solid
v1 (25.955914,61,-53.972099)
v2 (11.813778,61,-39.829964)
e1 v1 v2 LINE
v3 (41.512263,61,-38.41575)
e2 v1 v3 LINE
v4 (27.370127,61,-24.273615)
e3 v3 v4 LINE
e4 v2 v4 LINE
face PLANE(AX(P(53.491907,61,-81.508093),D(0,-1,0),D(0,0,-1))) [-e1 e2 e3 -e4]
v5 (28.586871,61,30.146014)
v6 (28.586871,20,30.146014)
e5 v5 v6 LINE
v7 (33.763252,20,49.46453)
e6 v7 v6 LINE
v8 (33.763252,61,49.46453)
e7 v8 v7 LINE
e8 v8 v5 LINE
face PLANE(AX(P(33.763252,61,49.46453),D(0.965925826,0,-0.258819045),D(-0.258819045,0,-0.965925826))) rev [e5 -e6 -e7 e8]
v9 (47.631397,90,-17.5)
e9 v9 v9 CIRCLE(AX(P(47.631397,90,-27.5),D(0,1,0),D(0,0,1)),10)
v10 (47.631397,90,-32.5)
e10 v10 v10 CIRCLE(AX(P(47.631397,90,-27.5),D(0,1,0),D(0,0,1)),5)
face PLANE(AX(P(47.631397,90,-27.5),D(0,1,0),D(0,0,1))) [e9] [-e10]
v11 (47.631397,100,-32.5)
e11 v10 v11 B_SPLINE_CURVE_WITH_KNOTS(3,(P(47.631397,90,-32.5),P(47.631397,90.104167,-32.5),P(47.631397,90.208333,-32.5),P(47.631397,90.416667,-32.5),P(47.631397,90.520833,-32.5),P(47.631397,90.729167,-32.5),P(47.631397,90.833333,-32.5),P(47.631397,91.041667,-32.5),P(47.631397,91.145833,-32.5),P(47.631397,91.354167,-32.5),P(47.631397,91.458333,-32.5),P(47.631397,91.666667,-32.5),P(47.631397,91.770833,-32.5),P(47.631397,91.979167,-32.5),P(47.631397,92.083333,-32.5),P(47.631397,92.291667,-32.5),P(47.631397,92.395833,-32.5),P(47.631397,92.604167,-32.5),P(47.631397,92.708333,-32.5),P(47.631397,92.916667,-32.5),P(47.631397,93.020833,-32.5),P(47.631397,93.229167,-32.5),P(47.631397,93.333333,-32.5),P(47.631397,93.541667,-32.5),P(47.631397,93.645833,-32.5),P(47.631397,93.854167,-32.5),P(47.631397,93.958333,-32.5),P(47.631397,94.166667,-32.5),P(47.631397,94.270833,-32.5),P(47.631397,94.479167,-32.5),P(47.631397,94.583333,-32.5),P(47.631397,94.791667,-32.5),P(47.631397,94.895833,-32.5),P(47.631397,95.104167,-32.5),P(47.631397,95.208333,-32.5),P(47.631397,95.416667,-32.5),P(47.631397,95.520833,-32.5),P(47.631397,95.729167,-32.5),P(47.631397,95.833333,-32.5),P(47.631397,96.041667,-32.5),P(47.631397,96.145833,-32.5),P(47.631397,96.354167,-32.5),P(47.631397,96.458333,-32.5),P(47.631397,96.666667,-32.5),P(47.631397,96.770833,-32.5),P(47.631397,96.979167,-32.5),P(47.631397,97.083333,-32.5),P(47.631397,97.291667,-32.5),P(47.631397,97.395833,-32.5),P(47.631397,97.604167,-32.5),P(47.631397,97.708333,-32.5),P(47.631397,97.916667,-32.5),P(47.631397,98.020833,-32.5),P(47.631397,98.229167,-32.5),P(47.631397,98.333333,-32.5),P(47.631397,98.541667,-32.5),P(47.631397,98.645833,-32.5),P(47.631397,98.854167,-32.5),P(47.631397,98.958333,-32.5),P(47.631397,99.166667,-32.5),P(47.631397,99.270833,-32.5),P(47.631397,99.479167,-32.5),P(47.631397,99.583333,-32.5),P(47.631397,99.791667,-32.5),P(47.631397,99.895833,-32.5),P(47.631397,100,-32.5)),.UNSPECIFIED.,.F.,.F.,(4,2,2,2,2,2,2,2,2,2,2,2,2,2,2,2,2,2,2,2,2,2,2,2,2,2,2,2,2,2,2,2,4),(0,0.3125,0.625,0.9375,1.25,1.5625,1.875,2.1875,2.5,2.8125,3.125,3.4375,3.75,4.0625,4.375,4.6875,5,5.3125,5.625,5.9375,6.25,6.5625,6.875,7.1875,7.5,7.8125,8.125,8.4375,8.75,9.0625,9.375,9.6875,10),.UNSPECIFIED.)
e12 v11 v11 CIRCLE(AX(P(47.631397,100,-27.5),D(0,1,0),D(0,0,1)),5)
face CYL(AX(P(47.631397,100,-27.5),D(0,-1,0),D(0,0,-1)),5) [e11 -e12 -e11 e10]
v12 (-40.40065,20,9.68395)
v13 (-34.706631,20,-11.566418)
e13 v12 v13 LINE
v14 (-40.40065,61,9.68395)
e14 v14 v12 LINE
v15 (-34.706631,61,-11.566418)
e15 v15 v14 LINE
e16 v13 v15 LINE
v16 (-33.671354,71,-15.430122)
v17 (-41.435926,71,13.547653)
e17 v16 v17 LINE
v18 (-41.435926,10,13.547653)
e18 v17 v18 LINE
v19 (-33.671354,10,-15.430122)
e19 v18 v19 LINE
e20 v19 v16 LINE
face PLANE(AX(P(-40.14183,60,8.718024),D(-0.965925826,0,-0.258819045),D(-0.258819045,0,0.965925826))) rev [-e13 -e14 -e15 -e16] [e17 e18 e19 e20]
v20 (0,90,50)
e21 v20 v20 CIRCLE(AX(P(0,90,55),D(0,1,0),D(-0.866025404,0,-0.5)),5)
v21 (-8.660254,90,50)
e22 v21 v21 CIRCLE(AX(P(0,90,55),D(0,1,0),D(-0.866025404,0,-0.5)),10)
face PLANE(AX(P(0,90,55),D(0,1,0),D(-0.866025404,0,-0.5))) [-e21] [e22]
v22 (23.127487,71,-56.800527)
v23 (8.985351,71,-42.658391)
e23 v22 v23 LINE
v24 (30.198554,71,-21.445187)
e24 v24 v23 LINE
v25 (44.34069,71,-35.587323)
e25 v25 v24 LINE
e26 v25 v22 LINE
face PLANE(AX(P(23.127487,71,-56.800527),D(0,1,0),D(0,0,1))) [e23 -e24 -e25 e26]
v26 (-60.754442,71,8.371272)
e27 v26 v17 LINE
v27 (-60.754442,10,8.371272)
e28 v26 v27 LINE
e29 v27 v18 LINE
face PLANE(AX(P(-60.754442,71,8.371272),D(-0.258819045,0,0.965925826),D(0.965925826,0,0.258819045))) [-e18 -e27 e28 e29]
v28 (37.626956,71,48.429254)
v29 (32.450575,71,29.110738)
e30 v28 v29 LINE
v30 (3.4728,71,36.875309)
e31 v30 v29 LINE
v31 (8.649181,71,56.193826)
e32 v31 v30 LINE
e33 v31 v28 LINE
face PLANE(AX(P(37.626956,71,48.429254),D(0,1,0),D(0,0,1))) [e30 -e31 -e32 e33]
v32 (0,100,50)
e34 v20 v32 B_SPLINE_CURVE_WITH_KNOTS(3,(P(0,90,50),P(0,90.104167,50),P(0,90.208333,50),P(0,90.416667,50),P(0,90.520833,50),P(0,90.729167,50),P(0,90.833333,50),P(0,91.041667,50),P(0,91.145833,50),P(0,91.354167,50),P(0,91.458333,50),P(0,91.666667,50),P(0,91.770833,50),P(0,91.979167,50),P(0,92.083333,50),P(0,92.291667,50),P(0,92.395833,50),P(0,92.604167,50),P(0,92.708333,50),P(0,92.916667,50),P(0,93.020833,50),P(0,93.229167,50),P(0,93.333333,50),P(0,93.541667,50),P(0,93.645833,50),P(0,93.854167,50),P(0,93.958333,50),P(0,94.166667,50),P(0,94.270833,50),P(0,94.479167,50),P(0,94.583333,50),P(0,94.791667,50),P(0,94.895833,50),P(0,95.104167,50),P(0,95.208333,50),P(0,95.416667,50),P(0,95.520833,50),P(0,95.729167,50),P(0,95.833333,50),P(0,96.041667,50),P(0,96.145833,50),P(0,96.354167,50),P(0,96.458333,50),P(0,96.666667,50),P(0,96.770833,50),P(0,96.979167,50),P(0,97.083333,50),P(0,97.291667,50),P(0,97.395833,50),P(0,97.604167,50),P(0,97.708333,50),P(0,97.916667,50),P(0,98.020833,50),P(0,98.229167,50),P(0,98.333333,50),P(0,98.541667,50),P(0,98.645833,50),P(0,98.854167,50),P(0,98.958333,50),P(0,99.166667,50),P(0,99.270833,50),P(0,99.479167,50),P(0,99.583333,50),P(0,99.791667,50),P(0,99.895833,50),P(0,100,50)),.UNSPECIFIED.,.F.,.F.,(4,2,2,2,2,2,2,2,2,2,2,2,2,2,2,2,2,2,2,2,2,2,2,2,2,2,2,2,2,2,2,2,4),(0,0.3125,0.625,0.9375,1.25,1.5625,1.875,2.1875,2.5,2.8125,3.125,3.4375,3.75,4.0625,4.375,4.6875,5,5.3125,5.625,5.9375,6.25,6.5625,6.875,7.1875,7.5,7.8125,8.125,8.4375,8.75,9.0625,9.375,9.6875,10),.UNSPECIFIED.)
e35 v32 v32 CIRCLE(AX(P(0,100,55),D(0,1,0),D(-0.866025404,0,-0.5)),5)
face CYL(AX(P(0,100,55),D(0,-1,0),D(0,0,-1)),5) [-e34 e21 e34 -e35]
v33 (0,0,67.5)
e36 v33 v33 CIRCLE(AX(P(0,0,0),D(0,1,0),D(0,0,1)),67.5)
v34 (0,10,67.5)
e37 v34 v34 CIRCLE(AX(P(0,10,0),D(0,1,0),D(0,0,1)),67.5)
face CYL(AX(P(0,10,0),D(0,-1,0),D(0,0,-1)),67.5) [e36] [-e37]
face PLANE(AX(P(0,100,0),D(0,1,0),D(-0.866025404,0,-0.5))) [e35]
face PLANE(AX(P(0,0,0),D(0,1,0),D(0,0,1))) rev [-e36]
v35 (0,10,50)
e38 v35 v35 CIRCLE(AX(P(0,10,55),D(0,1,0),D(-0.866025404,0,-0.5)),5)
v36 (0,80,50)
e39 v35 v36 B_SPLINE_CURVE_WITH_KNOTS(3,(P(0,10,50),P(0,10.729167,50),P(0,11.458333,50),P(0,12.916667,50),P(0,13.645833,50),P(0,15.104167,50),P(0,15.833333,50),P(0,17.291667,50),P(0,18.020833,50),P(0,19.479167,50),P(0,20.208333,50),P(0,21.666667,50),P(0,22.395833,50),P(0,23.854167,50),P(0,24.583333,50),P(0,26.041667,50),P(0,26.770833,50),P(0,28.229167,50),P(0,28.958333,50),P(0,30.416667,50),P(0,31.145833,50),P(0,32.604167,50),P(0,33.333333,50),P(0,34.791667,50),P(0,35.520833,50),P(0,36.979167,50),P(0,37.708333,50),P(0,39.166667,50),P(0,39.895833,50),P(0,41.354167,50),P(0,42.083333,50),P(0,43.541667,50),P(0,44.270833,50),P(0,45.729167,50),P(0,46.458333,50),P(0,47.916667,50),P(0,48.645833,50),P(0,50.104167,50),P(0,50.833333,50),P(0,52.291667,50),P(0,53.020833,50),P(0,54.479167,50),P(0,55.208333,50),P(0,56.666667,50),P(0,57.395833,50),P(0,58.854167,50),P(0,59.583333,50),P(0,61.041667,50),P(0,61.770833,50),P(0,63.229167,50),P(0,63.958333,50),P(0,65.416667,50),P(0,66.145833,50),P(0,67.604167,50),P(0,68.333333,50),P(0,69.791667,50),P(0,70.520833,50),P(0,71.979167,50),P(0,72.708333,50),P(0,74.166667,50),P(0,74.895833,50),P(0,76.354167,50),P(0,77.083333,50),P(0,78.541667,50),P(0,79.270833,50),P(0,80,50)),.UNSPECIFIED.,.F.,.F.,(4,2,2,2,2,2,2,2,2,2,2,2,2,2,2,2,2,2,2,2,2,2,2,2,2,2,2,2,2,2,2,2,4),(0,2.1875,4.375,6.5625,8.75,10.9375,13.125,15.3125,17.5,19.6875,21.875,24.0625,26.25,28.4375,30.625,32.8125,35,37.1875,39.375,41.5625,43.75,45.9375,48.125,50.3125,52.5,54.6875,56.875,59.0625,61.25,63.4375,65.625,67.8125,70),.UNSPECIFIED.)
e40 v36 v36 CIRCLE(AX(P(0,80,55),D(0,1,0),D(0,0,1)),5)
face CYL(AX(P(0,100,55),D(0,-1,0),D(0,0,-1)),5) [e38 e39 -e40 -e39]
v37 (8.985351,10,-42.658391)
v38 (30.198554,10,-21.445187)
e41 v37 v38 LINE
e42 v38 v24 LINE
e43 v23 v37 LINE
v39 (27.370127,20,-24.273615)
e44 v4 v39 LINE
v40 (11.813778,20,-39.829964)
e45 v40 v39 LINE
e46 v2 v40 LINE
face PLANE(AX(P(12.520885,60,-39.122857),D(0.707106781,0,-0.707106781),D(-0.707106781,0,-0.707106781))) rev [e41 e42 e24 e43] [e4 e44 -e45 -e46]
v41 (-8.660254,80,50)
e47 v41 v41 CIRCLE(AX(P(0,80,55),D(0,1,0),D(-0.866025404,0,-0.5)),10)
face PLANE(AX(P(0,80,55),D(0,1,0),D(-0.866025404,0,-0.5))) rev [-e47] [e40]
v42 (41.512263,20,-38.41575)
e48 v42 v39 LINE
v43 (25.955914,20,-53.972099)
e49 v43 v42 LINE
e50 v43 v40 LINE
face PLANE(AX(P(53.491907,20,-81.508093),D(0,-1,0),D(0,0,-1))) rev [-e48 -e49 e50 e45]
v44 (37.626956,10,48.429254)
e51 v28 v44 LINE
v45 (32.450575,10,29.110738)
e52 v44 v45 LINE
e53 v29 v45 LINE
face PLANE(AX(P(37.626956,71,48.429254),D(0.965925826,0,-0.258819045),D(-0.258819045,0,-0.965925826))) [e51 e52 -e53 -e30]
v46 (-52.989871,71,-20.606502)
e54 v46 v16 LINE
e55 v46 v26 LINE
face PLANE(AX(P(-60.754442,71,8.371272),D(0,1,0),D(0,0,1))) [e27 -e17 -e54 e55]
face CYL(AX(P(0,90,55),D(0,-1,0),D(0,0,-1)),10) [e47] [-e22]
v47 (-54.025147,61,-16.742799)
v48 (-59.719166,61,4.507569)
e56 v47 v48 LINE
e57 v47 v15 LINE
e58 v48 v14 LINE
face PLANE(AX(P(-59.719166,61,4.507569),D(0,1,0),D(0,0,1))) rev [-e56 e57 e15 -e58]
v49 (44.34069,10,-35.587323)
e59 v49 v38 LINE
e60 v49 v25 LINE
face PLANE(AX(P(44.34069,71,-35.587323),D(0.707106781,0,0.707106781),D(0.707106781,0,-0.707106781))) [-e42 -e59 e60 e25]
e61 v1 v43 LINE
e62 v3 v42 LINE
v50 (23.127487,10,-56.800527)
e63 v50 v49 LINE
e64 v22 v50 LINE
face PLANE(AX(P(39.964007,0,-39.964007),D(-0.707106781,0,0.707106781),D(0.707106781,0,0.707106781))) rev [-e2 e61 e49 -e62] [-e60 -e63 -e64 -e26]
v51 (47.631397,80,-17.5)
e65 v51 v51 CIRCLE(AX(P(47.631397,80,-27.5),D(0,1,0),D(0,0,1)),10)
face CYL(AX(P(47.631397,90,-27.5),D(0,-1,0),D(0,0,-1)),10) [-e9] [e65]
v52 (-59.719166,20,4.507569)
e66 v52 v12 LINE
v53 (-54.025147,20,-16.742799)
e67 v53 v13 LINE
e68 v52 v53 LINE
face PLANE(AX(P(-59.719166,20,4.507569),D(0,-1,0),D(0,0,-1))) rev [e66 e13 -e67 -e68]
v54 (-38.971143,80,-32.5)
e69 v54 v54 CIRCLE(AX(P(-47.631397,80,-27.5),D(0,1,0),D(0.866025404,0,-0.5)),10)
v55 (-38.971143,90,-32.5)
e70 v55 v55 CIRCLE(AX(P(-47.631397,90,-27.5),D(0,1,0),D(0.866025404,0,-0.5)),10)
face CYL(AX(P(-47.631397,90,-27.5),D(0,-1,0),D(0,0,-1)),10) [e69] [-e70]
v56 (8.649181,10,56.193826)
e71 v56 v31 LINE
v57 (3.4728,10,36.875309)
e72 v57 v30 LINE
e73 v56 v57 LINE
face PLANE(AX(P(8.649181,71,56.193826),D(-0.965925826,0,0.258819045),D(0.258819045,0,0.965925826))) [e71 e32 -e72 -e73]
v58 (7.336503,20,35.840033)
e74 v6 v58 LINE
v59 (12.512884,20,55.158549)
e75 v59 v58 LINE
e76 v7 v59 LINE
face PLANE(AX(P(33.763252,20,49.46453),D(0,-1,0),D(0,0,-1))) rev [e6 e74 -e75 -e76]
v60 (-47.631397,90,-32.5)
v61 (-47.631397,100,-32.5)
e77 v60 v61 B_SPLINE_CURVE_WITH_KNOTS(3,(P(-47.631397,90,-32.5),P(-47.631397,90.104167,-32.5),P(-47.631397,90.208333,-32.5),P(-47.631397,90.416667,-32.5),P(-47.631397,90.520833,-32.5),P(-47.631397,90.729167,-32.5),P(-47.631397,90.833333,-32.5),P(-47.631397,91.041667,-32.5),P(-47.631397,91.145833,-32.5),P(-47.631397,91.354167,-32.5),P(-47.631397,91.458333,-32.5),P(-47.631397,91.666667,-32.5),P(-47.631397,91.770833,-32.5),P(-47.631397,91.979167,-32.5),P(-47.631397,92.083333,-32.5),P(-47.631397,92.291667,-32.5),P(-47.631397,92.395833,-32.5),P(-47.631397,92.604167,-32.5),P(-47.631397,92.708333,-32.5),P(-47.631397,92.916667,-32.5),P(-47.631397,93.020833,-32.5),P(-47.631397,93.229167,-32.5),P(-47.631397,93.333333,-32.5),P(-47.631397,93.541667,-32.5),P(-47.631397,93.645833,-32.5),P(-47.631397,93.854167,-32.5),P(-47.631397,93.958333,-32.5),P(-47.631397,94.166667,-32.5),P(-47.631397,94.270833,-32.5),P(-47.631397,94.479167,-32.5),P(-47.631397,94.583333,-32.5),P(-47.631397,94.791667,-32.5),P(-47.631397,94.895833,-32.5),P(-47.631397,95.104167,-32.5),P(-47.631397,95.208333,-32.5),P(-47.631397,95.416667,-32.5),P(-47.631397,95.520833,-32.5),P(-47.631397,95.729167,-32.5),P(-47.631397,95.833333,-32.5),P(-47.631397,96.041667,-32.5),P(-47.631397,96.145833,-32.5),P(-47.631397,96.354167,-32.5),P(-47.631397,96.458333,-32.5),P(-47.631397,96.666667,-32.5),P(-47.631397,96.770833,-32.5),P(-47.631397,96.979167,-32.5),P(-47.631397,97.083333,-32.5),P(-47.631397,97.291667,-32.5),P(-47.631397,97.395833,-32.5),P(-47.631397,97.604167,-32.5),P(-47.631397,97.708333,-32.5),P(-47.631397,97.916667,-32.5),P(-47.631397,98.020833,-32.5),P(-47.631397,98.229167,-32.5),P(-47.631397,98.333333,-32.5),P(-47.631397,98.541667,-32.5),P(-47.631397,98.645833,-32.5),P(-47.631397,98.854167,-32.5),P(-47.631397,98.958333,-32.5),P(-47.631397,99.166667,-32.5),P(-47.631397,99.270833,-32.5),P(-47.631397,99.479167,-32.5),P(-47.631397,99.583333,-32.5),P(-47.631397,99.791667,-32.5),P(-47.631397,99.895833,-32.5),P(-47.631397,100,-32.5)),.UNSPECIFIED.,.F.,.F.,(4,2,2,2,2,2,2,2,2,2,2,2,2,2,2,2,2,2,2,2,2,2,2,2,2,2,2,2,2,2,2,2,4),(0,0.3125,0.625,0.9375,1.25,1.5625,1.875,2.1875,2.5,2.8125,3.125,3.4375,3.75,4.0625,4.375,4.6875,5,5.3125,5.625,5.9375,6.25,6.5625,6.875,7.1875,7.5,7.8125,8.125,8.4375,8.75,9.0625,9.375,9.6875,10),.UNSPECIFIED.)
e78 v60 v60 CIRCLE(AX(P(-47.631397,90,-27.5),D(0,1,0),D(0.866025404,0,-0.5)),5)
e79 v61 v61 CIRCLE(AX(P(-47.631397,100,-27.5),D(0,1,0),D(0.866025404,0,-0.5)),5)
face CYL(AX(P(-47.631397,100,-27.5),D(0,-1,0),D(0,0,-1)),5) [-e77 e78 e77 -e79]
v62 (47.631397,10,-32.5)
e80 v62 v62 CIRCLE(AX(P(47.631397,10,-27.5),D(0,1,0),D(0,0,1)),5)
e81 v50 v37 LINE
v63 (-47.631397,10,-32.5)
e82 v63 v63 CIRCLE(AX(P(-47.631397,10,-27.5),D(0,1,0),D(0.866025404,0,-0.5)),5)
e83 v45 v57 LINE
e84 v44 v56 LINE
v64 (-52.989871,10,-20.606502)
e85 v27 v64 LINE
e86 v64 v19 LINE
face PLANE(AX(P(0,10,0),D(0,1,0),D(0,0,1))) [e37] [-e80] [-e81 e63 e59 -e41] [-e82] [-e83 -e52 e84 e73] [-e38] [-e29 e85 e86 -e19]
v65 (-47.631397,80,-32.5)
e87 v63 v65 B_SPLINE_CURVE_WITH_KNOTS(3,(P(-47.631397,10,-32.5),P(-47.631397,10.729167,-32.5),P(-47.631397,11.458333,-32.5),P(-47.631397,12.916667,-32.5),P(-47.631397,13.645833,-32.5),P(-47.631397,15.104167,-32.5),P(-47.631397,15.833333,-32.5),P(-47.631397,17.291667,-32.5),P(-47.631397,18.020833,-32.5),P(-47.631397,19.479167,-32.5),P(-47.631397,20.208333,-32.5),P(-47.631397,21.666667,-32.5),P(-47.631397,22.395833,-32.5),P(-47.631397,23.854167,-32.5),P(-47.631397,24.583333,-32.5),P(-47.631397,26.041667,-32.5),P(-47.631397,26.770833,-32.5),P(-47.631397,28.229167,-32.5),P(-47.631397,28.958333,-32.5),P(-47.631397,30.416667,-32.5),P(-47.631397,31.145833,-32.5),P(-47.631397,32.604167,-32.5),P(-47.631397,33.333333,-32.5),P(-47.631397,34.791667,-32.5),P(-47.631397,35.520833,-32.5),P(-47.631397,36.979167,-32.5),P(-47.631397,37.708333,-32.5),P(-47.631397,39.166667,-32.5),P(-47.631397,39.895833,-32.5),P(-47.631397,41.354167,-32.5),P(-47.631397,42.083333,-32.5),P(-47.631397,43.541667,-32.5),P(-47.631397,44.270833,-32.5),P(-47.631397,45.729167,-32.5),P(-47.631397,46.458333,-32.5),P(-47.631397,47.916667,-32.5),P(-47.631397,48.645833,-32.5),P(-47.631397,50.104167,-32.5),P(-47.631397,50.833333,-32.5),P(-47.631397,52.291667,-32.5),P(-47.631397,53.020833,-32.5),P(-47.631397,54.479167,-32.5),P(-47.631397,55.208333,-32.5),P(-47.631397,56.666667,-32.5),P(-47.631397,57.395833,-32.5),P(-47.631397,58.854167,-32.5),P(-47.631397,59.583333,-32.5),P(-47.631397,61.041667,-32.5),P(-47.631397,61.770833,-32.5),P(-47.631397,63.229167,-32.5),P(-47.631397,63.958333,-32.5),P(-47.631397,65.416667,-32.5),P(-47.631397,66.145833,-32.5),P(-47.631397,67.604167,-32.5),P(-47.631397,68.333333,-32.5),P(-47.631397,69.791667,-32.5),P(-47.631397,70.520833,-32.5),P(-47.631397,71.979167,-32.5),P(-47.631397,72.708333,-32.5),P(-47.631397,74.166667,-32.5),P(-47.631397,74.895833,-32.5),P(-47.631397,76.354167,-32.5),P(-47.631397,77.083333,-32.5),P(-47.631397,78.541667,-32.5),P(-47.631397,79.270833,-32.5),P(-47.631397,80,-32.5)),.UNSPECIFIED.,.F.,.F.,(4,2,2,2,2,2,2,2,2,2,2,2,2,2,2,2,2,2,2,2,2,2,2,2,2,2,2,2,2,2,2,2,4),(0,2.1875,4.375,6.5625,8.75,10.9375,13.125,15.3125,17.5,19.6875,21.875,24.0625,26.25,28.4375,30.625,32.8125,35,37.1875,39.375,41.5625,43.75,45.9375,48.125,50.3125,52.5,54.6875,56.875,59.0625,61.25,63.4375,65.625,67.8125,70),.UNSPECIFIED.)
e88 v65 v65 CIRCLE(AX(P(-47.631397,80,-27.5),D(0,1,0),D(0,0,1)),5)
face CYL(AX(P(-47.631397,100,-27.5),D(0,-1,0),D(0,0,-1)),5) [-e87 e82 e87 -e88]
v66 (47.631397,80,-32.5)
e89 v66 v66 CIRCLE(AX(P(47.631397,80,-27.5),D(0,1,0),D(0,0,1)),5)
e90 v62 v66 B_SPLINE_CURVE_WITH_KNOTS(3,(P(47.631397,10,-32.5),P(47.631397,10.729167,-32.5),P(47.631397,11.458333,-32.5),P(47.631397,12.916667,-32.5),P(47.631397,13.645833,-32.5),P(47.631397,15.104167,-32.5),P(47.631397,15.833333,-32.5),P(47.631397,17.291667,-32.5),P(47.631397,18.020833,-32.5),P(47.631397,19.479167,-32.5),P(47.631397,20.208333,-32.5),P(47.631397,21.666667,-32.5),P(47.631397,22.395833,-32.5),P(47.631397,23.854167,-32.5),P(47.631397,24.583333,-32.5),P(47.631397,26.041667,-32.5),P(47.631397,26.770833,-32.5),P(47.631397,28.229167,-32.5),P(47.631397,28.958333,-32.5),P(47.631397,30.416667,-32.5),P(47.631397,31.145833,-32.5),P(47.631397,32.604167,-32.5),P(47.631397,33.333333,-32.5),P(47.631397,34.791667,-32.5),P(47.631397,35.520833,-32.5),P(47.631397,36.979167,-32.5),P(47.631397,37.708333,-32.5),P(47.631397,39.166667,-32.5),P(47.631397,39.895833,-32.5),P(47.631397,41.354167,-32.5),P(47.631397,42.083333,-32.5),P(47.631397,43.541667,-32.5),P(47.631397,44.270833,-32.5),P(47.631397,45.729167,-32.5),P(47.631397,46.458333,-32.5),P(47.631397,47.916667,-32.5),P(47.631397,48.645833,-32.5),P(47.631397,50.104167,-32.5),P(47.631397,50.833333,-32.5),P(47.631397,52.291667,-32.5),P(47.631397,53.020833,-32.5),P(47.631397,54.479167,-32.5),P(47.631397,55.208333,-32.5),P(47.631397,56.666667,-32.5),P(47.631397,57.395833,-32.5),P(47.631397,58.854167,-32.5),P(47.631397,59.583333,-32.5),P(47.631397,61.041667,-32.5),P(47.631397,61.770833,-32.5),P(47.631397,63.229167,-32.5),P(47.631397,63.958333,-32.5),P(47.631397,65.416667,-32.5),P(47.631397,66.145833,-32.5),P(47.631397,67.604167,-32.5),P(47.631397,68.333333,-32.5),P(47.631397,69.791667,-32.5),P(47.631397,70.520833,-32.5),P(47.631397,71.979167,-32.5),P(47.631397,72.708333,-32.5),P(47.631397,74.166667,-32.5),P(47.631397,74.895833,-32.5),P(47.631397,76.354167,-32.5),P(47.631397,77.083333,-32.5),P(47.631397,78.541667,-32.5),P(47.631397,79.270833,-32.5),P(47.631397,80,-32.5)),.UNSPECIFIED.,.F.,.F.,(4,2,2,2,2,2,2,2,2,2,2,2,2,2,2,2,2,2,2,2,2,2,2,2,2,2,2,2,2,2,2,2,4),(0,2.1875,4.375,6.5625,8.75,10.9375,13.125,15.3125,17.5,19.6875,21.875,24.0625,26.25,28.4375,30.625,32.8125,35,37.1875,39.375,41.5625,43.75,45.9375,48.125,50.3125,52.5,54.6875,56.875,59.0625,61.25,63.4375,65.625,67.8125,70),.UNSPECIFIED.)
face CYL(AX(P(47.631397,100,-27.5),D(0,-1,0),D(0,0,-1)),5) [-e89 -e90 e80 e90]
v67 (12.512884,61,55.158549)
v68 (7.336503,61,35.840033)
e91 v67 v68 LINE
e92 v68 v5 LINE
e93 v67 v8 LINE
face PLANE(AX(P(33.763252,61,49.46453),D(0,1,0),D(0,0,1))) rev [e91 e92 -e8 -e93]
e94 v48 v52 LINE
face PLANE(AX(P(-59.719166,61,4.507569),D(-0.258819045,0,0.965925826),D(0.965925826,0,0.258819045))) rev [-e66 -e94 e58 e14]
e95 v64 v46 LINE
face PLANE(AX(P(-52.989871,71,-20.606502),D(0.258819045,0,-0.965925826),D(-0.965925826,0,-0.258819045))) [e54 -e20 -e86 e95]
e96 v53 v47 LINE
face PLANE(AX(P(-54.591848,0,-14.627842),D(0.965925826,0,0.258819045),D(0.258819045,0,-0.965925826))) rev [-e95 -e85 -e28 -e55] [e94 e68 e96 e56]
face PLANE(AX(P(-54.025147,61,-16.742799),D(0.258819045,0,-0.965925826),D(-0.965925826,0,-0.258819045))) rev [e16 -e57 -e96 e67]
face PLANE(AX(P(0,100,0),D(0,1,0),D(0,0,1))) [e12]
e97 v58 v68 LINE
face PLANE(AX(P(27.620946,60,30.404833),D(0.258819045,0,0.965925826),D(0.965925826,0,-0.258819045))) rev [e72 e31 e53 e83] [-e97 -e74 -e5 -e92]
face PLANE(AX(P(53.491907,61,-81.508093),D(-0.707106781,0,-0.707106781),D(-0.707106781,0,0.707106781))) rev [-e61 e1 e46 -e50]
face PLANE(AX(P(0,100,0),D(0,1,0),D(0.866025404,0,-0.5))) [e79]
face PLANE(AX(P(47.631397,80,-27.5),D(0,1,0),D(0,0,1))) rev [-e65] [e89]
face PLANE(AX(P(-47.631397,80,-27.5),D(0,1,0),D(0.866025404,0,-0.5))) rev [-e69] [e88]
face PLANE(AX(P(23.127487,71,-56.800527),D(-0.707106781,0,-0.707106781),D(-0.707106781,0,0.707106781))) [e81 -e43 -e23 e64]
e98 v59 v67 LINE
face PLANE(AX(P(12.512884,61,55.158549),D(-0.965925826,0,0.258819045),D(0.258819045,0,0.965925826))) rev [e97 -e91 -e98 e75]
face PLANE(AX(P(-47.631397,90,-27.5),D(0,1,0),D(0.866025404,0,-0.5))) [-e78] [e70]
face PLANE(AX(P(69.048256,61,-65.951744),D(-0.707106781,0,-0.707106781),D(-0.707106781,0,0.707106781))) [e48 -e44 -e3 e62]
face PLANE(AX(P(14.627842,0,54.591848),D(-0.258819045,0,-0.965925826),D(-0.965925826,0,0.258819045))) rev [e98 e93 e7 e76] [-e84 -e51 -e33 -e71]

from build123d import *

# Parameters (mm, degrees)
BOSS_EXTRUDE1_OUTLINE_R = 67.5
BOSS_EXTRUDE1_DEPTH     = 10
SKETCH4_R               = 5
BOSS_EXTRUDE2_DEPTH     = 90
BOSS_EXTRUDE3_START     = 70
SKETCH4_3_R             = 10
SKETCH4_3_R_2           = 5
BOSS_EXTRUDE3_DEPTH     = 10
BOSS_EXTRUDE4_DEPTH     = 50
SKETCH6_W               = 30
SKETCH6_H               = 61
SKETCH6_W_2             = 22
SKETCH6_H_2             = 41
BOSS_EXTRUDE5_DEPTH     = 20
SKETCH6_7_W             = 22
SKETCH6_7_H             = 41
BOSS_EXTRUDE6_DEPTH     = 20
SKETCH6_3_W             = 22
SKETCH6_3_H             = 41
CUT_EXTRUDE1_DEPTH      = 166.583644089
CIRPATTERN1_COUNT       = 3


# Read off the part's stored shape, not the designer's step: Boss-Extrude1
with BuildPart() as part:
    # Boss-Extrude1 outline → Boss-Extrude1 (new body)
    with BuildSketch(Plane(origin=(0, 0, 0), x_dir=(1, 0, 0), z_dir=(0, 1, 0))):
        Circle(BOSS_EXTRUDE1_OUTLINE_R)
    extrude(amount=BOSS_EXTRUDE1_DEPTH)

    # Sketch4 → Boss-Extrude2 (add)
    with BuildSketch(Plane(origin=(0, 10, 0), x_dir=(1, 0, 0), z_dir=(0, 1, 0))):
        with Locations(Location((47.631397208, 27.5, 0), (0, 0, 90))):
            Circle(SKETCH4_R)
    boss_extrude2 = extrude(amount=BOSS_EXTRUDE2_DEPTH)

    # Sketch4<3> → Boss-Extrude3 (add)
    with BuildSketch(Plane(origin=(0, 10, 0), x_dir=(1, 0, 0), z_dir=(0, 1, 0)).offset(BOSS_EXTRUDE3_START)):
        with Locations(Location((47.631397208, 27.5, 0), (0, 0, 270))):
            Circle(SKETCH4_3_R)
        with Locations(Location((47.631397208, 27.5, 0), (0, 0, 90))):
            Circle(SKETCH4_3_R_2, mode=Mode.SUBTRACT)
    boss_extrude3 = extrude(amount=BOSS_EXTRUDE3_DEPTH)

    # Sketch5 → Boss-Extrude4 (add)
    with BuildSketch(Plane(origin=(0, 10, 0), x_dir=(1, 0, 0), z_dir=(0, 1, 0))):
        Polygon((12.520884891, 39.12285698), (16.056418797, 42.658390886), (30.19855442, 28.516255262), (26.663020514, 24.980721356), align=None)
    boss_extrude4 = extrude(amount=BOSS_EXTRUDE4_DEPTH)

    # Sketch6 → Boss-Extrude5 (add)
    with BuildSketch(Plane(origin=(25.821870935, 0, -25.821870935), x_dir=(0.7071067811865516, 0, 0.7071067811865435), z_dir=(-0.7071067811865435, 0, 0.7071067811865516))):
        with Locations((-8.810434857, 40.5)):
            Rectangle(SKETCH6_W, SKETCH6_H)
        with Locations((-8.810434857, 40.5)):
            Rectangle(SKETCH6_W_2, SKETCH6_H_2, mode=Mode.SUBTRACT)
    boss_extrude5 = extrude(amount=-BOSS_EXTRUDE5_DEPTH)

    # Sketch6<7> → Boss-Extrude6 (add)
    with BuildSketch(Plane(origin=(25.821870935, 0, -25.821870935), x_dir=(0.7071067811865516, 0, 0.7071067811865435), z_dir=(-0.7071067811865435, 0, 0.7071067811865516))):
        with Locations((-8.810434857, 40.5)):
            Rectangle(SKETCH6_7_W, SKETCH6_7_H)
    extrude(amount=-BOSS_EXTRUDE6_DEPTH)

    # Sketch6<3> → Cut-Extrude1 (cut, through all)
    with BuildSketch(Plane(origin=(25.821870935, 0, -25.821870935), x_dir=(0.7071067811865516, 0, 0.7071067811865435), z_dir=(-0.7071067811865435, 0, 0.7071067811865516))):
        with Locations((-8.810434857, 40.5)):
            Rectangle(SKETCH6_3_W, SKETCH6_3_H)
    cut_extrude1 = extrude(amount=-CUT_EXTRUDE1_DEPTH, mode=Mode.SUBTRACT)

    # CirPattern1: Boss-Extrude2, Boss-Extrude3, Boss-Extrude4, Boss-Extrude5, Cut-Extrude1 ×3 about axis
    cirpattern1_axis = Axis((0, 0, 0), (0, 1, 0))
    add([boss_extrude2.rotate(cirpattern1_axis, i * 360 / CIRPATTERN1_COUNT) for i in range(1, CIRPATTERN1_COUNT)])
    add([boss_extrude3.rotate(cirpattern1_axis, i * 360 / CIRPATTERN1_COUNT) for i in range(1, CIRPATTERN1_COUNT)])
    add([boss_extrude4.rotate(cirpattern1_axis, i * 360 / CIRPATTERN1_COUNT) for i in range(1, CIRPATTERN1_COUNT)])
    add([boss_extrude5.rotate(cirpattern1_axis, i * 360 / CIRPATTERN1_COUNT) for i in range(1, CIRPATTERN1_COUNT)])
    add([cut_extrude1.rotate(cirpattern1_axis, i * 360 / CIRPATTERN1_COUNT) for i in range(1, CIRPATTERN1_COUNT)], mode=Mode.SUBTRACT)


solid = part.part
